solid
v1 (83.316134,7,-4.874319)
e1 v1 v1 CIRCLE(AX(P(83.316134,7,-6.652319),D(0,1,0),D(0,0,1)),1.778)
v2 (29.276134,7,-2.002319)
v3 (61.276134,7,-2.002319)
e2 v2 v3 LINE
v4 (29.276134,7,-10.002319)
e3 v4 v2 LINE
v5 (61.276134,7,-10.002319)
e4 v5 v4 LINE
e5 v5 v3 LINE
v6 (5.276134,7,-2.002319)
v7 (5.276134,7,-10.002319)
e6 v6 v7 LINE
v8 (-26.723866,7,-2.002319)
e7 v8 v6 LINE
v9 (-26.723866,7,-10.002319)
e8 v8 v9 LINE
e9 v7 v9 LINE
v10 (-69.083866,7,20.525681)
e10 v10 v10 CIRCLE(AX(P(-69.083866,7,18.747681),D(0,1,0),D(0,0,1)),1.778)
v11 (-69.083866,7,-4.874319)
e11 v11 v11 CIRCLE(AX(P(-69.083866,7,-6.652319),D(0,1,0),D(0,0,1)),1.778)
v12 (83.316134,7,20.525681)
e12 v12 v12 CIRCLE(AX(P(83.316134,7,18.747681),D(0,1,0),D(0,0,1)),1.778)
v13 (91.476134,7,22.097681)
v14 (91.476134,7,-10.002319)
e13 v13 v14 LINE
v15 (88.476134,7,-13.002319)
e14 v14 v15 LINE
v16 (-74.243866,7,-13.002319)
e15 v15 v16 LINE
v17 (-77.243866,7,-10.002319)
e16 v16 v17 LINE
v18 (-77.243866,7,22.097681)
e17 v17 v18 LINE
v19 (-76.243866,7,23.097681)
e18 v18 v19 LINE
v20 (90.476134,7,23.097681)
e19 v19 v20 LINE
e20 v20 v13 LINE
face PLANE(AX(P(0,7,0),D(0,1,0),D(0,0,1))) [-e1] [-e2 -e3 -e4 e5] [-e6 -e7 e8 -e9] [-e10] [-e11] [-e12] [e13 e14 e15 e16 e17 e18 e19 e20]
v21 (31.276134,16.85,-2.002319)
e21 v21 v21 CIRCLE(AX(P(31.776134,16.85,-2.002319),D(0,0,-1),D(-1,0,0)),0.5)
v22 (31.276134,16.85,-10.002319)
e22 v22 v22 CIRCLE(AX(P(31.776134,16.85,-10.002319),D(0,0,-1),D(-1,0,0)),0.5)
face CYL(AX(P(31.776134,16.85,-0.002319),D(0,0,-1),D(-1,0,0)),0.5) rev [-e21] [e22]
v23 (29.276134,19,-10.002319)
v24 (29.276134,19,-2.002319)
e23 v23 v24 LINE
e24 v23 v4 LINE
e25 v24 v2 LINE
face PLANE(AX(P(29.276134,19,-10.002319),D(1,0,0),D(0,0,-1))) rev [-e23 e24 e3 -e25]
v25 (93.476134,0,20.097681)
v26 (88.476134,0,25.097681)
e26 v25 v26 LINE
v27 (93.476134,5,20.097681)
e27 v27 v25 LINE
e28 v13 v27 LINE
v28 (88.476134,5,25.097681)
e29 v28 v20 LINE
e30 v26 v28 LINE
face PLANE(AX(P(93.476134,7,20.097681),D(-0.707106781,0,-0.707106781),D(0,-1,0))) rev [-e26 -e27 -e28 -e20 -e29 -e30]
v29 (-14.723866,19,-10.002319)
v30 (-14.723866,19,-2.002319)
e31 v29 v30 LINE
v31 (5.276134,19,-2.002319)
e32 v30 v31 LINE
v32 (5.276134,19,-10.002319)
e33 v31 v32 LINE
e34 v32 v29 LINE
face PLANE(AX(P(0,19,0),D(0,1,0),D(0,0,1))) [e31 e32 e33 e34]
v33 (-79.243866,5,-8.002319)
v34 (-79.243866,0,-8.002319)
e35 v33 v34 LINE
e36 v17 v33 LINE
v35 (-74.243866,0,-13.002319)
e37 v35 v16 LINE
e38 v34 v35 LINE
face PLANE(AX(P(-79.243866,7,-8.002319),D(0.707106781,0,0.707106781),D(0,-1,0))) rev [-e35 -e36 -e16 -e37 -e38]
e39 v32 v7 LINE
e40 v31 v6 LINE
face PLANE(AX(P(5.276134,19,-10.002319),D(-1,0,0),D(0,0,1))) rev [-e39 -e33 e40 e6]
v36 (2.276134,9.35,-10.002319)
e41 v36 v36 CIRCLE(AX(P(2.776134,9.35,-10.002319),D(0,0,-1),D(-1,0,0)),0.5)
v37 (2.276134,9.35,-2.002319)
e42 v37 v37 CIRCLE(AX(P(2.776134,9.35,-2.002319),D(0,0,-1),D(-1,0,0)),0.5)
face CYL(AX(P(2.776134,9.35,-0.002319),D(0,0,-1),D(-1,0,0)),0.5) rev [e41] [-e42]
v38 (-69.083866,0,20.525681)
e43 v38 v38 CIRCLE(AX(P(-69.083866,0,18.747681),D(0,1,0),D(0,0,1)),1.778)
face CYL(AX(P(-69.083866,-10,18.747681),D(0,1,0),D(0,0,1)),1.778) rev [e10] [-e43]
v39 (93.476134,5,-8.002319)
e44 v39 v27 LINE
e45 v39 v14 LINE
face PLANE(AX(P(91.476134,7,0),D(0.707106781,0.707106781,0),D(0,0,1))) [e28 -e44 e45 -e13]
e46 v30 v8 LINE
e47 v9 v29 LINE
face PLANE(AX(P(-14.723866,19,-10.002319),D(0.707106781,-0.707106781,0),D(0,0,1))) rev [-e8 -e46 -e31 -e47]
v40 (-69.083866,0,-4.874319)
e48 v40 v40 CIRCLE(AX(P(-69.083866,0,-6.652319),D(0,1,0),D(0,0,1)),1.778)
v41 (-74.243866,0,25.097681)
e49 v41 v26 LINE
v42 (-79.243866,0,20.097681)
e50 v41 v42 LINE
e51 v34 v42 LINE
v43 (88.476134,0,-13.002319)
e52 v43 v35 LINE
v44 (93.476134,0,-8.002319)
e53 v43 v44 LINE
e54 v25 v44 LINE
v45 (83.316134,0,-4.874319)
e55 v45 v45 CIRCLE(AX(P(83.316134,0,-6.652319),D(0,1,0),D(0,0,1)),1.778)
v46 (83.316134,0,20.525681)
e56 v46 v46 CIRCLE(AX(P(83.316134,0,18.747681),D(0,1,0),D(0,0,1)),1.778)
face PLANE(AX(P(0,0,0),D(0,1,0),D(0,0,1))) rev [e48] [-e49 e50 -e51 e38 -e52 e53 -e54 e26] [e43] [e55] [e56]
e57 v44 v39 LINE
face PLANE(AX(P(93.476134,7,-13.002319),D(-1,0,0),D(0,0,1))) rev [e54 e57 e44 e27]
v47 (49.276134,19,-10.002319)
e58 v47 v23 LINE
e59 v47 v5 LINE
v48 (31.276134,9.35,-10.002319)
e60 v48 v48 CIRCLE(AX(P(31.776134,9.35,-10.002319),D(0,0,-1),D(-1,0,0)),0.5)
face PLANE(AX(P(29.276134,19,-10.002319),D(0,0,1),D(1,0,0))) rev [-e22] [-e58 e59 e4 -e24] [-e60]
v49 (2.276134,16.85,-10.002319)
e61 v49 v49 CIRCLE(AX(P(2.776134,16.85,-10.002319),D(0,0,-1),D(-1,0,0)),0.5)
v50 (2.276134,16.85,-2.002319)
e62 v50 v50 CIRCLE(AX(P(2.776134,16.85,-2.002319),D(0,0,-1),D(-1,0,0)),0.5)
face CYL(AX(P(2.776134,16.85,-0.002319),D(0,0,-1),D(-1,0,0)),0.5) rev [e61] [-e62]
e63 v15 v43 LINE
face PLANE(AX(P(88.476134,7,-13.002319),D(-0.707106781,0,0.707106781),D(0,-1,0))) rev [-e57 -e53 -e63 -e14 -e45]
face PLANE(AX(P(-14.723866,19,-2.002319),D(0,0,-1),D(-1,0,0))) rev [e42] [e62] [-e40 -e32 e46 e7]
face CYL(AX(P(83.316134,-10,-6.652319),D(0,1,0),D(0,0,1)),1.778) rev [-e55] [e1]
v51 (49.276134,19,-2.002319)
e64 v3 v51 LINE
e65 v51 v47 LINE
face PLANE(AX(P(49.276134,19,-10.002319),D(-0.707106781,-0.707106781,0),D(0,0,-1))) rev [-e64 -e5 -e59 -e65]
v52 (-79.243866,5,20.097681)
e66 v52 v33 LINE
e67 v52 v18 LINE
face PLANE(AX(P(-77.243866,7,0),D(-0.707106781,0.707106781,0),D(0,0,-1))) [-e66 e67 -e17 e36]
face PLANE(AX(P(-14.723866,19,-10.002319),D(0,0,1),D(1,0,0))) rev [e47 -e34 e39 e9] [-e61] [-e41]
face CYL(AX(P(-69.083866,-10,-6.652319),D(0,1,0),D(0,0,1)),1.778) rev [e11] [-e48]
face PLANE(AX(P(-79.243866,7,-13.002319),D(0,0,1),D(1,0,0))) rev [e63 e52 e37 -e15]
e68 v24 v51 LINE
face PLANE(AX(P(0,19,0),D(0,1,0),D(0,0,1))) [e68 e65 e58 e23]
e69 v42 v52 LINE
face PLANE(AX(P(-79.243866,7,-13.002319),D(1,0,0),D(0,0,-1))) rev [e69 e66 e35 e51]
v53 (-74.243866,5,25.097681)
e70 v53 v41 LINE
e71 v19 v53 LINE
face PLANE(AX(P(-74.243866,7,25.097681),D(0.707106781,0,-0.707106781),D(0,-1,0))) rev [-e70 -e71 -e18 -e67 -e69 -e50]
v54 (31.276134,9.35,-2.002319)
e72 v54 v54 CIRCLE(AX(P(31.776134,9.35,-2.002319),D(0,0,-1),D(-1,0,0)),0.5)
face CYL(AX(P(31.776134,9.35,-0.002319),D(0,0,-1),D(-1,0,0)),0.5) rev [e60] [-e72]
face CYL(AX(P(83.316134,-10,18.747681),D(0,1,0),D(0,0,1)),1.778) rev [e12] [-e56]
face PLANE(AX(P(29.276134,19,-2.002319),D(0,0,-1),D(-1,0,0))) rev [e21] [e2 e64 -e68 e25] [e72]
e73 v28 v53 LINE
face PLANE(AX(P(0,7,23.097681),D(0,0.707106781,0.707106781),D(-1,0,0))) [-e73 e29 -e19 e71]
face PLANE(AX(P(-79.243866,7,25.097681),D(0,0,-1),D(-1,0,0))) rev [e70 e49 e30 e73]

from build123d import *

# Parameters (mm, degrees)
SKETCH1_W           = 172.72
SKETCH1_H           = 38.1
BOSS_EXTRUDE1_DEPTH = 7
SKETCH2_R           = 1.778
CUT_EXTRUDE1_DEPTH  = 17
SKETCH3_W           = 20
SKETCH3_H           = 8
BOSS_EXTRUDE2_DEPTH = 12
SKETCH4_R           = 0.5
CUT_EXTRUDE2_DEPTH  = 10
CHAMFER1_SIZE       = 12
CHAMFER2_SIZE       = 2
CHAMFER3_SIZE       = 5


# Some blends are built 0.0001 mm under size
with BuildPart() as part:
    # Sketch1 → Boss-Extrude1 (new body)
    with BuildSketch(Plane(origin=(0, 0, 0), x_dir=(1, 0, 0), z_dir=(0, 1, 0))):
        with Locations((7.116134283, -6.04768057)):
            Rectangle(SKETCH1_W, SKETCH1_H)
    extrude(amount=BOSS_EXTRUDE1_DEPTH)

    # Sketch2 → Cut-Extrude1 (cut)
    with BuildSketch(Plane(origin=(0, 7, 0), x_dir=(1, 0, 0), z_dir=(0, 1, 0))):
        with Locations(Location((-69.083865717, 6.65231943, 0), (0, 0, 270))):
            Circle(SKETCH2_R)
        with Locations(Location((-69.083865717, -18.74768057, 0), (0, 0, 270))):
            Circle(SKETCH2_R)
        with Locations(Location((83.316134283, 6.65231943, 0), (0, 0, 270))):
            Circle(SKETCH2_R)
        with Locations(Location((83.316134283, -18.74768057, 0), (0, 0, 270))):
            Circle(SKETCH2_R)
    extrude(amount=-CUT_EXTRUDE1_DEPTH, mode=Mode.SUBTRACT)

    # Sketch3 → Boss-Extrude2 (add)
    with BuildSketch(Plane(origin=(0, 7, 0), x_dir=(1, 0, 0), z_dir=(0, 1, 0))):
        with Locations((-4.723865717, 6.00231943)):
            Rectangle(SKETCH3_W, SKETCH3_H)
        with Locations((39.276134283, 6.00231943)):
            Rectangle(SKETCH3_W, SKETCH3_H)
    extrude(amount=BOSS_EXTRUDE2_DEPTH)

    # Sketch4 → Cut-Extrude2 (cut)
    with BuildSketch(Plane(origin=(0, 0, -10.00231943), x_dir=(-1, 0, 0), z_dir=(0, 0, -1))):
        with Locations((-31.776134283, 16.85)):
            Circle(SKETCH4_R)
        with Locations((-31.776134283, 9.35)):
            Circle(SKETCH4_R)
        with Locations((-2.776134283, 9.35)):
            Circle(SKETCH4_R)
        with Locations((-2.776134283, 16.85)):
            Circle(SKETCH4_R)
    extrude(amount=-CUT_EXTRUDE2_DEPTH, mode=Mode.SUBTRACT)

    # Chamfer1
    chamfer1_edges = [part.edges().sort_by_distance(p)[0] for p in [
        (49.276134283, 7, -6.00231943),
        (-14.723865717, 7, -6.00231943),
    ]]
    chamfer(chamfer1_edges, length=CHAMFER1_SIZE - 0.0001)  # a hair under: the kernel refuses the full size

    # Chamfer2
    chamfer2_edges = [part.edges().sort_by_distance(p)[0] for p in [
        (93.476134283, 7, 6.04768057),
        (-79.243865717, 7, 6.04768057),
        (7.116134283, 7, 25.09768057),
    ]]
    chamfer(chamfer2_edges, length=CHAMFER2_SIZE)

    # Chamfer3
    # the kernel refuses this chamfer: 5 mm, written as the material it takes off along each edge
    with BuildSketch(Plane(origin=(93.476134283, -12.85841494, -13.00231943), x_dir=(-0.9996219169112968, 0, -0.027495876610586282), z_dir=(0, 1, 0)), Plane(origin=(93.476134283, -12.85841494, 25.09768057), x_dir=(0.0274958766105877, 0, -0.9996219169112968), z_dir=(0, 1, 0))) as chamfer3_piece_1:
        Polygon((CHAMFER3_SIZE * 0.999621916911, CHAMFER3_SIZE * 0.0274958766106), (-CHAMFER3_SIZE * 0.0274958766106, CHAMFER3_SIZE * 0.999621916911), (0, 0), align=None)
    extrude(amount=30.71682988, mode=Mode.SUBTRACT)
    with BuildSketch(Plane(origin=(-79.243865717, -12.85841494, 25.09768057), x_dir=(-0.0274958766105877, 0, -0.9996219169112968), z_dir=(0, 1, 0)), Plane(origin=(-79.243865717, -12.85841494, -13.00231943), x_dir=(0.9996219169112968, 0, -0.027495876610586282), z_dir=(0, 1, 0))) as chamfer3_piece_2:
        Polygon((CHAMFER3_SIZE * 0.999621916911, -CHAMFER3_SIZE * 0.0274958766106), (-CHAMFER3_SIZE * 0.0274958766106, -CHAMFER3_SIZE * 0.999621916911), (0, 0), align=None)
    extrude(amount=30.71682988, mode=Mode.SUBTRACT)


solid = part.part
